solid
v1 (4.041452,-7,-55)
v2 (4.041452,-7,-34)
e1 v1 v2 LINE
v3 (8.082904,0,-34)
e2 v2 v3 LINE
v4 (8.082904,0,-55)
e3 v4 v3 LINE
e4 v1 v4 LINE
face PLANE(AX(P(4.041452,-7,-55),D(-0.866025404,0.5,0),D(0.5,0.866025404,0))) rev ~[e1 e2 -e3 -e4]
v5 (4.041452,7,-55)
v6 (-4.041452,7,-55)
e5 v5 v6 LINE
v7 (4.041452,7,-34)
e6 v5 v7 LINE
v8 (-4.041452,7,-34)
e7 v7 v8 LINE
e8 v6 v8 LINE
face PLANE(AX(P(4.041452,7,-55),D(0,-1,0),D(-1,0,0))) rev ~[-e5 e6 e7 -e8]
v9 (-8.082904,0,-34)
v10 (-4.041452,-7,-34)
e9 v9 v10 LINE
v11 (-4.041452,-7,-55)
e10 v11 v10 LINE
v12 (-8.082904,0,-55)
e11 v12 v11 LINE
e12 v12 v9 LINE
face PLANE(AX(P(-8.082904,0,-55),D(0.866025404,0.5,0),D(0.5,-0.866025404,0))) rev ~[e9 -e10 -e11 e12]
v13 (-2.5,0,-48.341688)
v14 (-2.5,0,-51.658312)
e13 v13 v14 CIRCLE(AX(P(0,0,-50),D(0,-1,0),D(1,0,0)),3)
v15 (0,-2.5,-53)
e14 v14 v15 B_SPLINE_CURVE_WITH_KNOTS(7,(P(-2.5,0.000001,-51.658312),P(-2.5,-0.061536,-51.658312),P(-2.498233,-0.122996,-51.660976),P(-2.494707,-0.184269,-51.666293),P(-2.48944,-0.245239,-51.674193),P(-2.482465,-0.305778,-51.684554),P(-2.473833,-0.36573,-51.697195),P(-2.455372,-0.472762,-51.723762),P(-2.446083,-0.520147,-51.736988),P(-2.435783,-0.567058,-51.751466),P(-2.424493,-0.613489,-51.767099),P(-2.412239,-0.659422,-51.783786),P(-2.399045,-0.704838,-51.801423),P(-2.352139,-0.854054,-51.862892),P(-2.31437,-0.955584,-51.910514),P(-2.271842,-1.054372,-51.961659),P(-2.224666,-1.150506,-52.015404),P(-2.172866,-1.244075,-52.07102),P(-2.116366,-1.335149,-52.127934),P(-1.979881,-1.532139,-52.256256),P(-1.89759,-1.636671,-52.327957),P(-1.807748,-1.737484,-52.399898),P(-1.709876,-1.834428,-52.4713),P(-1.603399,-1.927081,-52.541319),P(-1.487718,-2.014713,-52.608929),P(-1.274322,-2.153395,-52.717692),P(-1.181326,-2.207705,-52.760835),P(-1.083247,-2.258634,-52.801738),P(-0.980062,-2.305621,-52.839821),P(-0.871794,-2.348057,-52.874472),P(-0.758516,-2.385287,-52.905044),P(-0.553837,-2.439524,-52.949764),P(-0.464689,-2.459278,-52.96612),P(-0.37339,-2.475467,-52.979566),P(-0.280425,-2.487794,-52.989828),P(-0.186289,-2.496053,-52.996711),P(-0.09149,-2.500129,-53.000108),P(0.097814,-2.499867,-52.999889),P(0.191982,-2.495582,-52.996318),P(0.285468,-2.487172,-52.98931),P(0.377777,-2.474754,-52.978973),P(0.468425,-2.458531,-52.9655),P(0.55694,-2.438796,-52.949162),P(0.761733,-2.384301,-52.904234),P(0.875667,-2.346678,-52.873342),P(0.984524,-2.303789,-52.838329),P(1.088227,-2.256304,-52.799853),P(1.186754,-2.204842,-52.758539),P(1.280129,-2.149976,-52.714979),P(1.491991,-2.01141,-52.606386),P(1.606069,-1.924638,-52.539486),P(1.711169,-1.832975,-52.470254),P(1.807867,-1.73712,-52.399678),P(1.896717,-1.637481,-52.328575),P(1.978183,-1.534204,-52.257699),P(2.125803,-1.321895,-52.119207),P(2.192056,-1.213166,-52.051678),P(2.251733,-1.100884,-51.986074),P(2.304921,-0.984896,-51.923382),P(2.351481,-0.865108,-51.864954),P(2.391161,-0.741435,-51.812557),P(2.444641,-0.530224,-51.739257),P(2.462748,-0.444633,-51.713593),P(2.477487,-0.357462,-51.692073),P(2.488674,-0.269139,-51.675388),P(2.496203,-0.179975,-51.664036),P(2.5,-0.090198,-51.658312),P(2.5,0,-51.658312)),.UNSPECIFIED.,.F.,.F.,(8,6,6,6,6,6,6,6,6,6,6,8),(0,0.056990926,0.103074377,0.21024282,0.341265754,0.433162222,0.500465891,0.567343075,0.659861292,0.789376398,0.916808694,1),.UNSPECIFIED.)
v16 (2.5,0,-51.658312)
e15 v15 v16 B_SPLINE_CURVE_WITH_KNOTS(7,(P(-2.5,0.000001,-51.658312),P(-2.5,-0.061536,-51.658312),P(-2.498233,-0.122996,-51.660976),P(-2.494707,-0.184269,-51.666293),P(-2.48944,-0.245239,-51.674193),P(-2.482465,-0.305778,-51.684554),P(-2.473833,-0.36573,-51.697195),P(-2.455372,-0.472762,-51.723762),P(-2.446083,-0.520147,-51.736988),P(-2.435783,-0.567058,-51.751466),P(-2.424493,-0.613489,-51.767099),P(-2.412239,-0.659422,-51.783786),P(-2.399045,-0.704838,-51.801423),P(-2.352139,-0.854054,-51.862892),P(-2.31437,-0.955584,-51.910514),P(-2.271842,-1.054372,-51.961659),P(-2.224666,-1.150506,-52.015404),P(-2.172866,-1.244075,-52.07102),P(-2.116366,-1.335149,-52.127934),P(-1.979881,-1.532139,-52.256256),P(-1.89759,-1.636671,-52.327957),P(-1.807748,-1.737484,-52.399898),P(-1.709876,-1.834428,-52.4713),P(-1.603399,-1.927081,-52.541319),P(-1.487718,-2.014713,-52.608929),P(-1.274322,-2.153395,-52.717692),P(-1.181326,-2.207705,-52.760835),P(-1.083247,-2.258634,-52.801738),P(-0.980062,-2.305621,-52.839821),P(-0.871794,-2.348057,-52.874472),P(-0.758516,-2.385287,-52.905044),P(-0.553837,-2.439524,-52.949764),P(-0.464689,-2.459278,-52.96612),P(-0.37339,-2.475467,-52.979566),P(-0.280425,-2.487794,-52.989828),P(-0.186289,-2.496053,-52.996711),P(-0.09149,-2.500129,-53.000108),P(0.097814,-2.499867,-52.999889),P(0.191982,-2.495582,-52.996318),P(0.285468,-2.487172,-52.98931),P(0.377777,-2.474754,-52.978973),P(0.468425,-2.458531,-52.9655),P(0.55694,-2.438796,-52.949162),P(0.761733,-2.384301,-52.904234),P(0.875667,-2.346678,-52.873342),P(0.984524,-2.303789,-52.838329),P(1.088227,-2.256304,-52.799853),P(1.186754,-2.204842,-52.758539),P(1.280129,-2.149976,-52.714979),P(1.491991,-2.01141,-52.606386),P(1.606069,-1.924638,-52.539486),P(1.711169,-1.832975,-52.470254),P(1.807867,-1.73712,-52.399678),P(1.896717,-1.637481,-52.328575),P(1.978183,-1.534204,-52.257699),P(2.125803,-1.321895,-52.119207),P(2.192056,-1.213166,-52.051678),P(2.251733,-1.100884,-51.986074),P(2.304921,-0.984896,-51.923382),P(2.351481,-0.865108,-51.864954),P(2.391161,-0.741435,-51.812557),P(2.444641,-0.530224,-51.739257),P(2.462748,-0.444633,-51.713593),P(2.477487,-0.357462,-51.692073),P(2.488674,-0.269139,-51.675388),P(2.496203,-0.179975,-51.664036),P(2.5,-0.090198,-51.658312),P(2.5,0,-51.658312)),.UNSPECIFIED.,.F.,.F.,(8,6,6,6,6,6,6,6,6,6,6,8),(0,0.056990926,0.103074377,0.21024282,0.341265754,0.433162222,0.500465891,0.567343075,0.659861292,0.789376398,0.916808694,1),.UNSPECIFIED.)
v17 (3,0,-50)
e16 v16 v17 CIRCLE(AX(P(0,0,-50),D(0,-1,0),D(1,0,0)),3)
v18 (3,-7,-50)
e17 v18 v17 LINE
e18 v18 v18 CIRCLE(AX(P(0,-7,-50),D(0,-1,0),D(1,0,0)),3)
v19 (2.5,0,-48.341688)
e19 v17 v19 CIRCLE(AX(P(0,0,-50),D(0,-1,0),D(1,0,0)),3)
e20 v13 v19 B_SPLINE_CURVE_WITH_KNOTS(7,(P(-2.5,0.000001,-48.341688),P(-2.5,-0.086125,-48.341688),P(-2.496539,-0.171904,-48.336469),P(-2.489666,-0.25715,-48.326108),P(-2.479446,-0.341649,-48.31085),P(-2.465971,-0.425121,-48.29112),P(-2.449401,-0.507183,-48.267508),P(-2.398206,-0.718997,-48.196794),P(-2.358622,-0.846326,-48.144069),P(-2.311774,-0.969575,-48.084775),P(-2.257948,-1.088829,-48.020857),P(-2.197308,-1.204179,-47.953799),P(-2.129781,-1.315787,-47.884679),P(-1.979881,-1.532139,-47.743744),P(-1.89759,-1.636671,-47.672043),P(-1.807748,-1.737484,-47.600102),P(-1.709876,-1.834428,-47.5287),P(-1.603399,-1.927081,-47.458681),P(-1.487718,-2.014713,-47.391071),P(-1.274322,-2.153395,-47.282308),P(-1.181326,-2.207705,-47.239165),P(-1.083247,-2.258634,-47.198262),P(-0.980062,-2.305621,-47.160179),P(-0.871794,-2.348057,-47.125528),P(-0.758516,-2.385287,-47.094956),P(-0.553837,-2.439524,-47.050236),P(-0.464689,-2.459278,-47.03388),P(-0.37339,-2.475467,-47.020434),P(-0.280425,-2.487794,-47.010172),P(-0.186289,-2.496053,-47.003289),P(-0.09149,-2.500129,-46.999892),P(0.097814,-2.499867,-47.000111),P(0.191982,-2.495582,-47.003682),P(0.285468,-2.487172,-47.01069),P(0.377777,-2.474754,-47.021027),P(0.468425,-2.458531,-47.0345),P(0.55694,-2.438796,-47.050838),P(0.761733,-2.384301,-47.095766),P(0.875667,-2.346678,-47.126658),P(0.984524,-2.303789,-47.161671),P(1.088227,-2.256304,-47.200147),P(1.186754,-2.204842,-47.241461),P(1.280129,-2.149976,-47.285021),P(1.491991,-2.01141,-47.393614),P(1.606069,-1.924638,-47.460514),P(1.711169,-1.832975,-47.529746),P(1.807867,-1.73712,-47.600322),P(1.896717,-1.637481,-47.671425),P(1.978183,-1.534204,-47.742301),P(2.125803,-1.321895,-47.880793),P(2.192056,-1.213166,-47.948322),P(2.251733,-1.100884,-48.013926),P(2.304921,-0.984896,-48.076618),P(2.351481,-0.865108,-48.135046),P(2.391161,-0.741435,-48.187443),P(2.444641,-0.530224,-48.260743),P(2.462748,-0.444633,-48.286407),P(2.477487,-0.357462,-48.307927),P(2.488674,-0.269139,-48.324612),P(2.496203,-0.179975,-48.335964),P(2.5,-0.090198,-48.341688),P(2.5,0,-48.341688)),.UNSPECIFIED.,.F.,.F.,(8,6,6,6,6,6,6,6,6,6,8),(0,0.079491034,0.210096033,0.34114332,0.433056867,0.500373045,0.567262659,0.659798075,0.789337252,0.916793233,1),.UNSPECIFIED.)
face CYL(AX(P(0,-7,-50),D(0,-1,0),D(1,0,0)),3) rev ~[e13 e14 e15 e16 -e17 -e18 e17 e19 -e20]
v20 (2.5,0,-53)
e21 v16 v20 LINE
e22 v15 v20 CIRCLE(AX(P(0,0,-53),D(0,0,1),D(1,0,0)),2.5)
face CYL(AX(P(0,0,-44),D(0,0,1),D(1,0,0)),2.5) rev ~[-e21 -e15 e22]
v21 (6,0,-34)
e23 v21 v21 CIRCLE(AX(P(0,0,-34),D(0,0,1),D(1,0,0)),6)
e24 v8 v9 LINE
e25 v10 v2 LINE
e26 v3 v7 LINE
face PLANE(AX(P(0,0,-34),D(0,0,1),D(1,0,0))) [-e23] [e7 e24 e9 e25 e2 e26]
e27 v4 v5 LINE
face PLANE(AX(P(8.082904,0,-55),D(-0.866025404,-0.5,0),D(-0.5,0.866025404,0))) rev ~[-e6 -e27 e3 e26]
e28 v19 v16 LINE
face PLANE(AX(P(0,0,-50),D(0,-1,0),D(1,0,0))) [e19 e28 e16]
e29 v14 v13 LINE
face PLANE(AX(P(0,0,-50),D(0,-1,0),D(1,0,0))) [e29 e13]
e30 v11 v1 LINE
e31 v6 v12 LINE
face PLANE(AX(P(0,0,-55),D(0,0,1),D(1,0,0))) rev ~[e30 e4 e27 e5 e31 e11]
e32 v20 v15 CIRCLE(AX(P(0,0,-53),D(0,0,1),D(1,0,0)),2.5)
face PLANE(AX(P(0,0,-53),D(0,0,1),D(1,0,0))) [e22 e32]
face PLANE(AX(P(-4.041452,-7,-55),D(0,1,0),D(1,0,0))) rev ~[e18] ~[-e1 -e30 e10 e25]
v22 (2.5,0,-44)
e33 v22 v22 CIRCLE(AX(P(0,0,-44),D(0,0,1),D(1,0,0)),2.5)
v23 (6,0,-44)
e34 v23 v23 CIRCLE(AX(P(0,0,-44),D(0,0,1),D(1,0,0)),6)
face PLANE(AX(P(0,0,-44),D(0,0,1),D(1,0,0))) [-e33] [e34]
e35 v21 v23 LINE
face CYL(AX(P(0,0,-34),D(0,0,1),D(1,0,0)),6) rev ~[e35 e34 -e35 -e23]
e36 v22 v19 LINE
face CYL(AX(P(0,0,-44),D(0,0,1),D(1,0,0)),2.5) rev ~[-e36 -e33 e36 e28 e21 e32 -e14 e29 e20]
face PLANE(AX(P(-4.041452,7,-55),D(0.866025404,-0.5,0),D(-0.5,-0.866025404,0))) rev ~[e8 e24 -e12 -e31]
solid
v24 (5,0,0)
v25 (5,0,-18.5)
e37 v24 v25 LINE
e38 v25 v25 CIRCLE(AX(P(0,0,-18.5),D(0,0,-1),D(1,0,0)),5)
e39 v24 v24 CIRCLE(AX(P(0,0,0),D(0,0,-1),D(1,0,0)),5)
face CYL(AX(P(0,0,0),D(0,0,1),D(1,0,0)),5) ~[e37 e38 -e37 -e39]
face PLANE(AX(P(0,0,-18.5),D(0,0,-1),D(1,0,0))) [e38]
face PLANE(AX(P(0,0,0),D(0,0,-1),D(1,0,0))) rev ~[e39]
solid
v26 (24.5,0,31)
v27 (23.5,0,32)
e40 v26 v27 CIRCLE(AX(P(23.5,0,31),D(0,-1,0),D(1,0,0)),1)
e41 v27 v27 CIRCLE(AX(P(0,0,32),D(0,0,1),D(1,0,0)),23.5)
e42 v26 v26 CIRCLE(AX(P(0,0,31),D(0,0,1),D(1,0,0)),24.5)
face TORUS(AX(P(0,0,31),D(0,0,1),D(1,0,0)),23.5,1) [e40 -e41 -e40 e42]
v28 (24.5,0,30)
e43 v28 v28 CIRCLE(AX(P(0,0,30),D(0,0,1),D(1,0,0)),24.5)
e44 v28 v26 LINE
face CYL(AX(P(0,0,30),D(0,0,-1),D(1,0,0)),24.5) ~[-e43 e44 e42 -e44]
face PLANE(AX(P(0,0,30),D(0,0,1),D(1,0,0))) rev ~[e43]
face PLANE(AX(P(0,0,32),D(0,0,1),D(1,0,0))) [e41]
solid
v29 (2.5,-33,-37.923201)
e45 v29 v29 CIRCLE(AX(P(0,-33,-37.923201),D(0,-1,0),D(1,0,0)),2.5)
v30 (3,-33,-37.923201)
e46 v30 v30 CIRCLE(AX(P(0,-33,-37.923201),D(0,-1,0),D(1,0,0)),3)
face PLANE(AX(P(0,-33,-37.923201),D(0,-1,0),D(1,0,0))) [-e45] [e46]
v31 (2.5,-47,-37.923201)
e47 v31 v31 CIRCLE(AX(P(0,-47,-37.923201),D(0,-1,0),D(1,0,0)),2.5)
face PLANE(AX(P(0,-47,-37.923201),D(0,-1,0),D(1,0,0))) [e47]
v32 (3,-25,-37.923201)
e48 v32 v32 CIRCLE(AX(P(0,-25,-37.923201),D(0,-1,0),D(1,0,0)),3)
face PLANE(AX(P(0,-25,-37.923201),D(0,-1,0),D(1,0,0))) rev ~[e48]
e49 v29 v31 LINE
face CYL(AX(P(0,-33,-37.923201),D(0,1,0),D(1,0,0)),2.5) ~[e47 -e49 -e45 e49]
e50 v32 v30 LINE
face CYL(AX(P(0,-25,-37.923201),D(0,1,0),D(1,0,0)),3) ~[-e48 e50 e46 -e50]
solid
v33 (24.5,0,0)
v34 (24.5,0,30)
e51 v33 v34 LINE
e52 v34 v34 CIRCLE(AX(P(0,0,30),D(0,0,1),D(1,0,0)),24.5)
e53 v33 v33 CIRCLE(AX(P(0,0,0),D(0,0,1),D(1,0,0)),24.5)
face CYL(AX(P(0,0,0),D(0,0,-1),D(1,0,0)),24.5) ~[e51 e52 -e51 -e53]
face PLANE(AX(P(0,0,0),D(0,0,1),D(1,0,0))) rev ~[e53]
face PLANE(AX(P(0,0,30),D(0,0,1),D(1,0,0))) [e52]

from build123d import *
from build123d import SkipClean  # not in build123d's __all__

# Parameters (mm, degrees)
F0_R      = 24.5
F1_DEPTH  = 30
F2_R      = 5
F3_DEPTH  = 18.5
F6_DEPTH  = 21
F7_R      = 6
F8_DEPTH  = 10
F9_R      = 2.5
F10_DEPTH = 9
F11_R     = 3
F12_DEPTH = 7
F14_R     = 3
F15_DEPTH = 8
F16_R     = 2.5
F17_DEPTH = 14
F18_R     = 24.5
F19_DEPTH = 2
F20_R     = 1


with BuildPart() as f1:
    # F0 (on Top) → F1 (new body)
    with BuildSketch(Plane.XY):
        Circle(F0_R)
    extrude(amount=F1_DEPTH)


with BuildPart() as f3:
    # F2 (on face) → F3 (new body)
    with BuildSketch(Plane(origin=(0, 0, 0), x_dir=(1, 0, 0), z_dir=(0, 0, -1))):
        Circle(F2_R)
    extrude(amount=F3_DEPTH)


with BuildPart() as f6:
    # F5 (on offset) → F6 (new body)
    with BuildSketch(Plane.XY.offset(-55)):
        Polygon((4.0414518843, 7), (-4.0414518843, 7), (-8.0829037687, 0), (-4.0414518843, -7), (4.0414518843, -7), (8.0829037687, 0), align=None)
    extrude(amount=F6_DEPTH)

    # F7 (on face) → F8 (cut)
    with BuildSketch(Plane.XY.offset(-34)):
        Circle(F7_R)
    extrude(amount=-F8_DEPTH, mode=Mode.SUBTRACT)

    # F9 (on face) → F10 (cut)
    with BuildSketch(Plane.XY.offset(-44)):
        Circle(F9_R)
    extrude(amount=-F10_DEPTH, mode=Mode.SUBTRACT)

    # F11 (on face) → F12 (cut)
    with BuildSketch(Plane.XZ.offset(7)):
        with Locations((0, -50)):
            Circle(F11_R)
    with SkipClean():  # cleaning this boolean's faces spoils the solid; the shape is the same uncleaned
        extrude(amount=-F12_DEPTH, mode=Mode.SUBTRACT)


with BuildPart() as f15:
    # F14 (on offset) → F15 (new body)
    with BuildSketch(Plane.XZ.offset(25)):
        with Locations((0, -37.9232009678)):
            Circle(F14_R)
    extrude(amount=F15_DEPTH)

    # F16 (on face) → F17 (join)
    with BuildSketch(Plane.XZ.offset(33)):
        with Locations((0, -37.9232009678)):
            Circle(F16_R)
    extrude(amount=F17_DEPTH)


with BuildPart() as f19:
    # F18 (on face) → F19 (new body)
    with BuildSketch(Plane.XY.offset(30)):
        Circle(F18_R)
    extrude(amount=F19_DEPTH)

    # F20
    f20_edges = [f19.edges().sort_by_distance(p)[0] for p in [
        (-24.5, 0, 32),
    ]]
    fillet(f20_edges, radius=F20_R)


solid = Compound([f1.part, f3.part, f6.part, f15.part, f19.part])
